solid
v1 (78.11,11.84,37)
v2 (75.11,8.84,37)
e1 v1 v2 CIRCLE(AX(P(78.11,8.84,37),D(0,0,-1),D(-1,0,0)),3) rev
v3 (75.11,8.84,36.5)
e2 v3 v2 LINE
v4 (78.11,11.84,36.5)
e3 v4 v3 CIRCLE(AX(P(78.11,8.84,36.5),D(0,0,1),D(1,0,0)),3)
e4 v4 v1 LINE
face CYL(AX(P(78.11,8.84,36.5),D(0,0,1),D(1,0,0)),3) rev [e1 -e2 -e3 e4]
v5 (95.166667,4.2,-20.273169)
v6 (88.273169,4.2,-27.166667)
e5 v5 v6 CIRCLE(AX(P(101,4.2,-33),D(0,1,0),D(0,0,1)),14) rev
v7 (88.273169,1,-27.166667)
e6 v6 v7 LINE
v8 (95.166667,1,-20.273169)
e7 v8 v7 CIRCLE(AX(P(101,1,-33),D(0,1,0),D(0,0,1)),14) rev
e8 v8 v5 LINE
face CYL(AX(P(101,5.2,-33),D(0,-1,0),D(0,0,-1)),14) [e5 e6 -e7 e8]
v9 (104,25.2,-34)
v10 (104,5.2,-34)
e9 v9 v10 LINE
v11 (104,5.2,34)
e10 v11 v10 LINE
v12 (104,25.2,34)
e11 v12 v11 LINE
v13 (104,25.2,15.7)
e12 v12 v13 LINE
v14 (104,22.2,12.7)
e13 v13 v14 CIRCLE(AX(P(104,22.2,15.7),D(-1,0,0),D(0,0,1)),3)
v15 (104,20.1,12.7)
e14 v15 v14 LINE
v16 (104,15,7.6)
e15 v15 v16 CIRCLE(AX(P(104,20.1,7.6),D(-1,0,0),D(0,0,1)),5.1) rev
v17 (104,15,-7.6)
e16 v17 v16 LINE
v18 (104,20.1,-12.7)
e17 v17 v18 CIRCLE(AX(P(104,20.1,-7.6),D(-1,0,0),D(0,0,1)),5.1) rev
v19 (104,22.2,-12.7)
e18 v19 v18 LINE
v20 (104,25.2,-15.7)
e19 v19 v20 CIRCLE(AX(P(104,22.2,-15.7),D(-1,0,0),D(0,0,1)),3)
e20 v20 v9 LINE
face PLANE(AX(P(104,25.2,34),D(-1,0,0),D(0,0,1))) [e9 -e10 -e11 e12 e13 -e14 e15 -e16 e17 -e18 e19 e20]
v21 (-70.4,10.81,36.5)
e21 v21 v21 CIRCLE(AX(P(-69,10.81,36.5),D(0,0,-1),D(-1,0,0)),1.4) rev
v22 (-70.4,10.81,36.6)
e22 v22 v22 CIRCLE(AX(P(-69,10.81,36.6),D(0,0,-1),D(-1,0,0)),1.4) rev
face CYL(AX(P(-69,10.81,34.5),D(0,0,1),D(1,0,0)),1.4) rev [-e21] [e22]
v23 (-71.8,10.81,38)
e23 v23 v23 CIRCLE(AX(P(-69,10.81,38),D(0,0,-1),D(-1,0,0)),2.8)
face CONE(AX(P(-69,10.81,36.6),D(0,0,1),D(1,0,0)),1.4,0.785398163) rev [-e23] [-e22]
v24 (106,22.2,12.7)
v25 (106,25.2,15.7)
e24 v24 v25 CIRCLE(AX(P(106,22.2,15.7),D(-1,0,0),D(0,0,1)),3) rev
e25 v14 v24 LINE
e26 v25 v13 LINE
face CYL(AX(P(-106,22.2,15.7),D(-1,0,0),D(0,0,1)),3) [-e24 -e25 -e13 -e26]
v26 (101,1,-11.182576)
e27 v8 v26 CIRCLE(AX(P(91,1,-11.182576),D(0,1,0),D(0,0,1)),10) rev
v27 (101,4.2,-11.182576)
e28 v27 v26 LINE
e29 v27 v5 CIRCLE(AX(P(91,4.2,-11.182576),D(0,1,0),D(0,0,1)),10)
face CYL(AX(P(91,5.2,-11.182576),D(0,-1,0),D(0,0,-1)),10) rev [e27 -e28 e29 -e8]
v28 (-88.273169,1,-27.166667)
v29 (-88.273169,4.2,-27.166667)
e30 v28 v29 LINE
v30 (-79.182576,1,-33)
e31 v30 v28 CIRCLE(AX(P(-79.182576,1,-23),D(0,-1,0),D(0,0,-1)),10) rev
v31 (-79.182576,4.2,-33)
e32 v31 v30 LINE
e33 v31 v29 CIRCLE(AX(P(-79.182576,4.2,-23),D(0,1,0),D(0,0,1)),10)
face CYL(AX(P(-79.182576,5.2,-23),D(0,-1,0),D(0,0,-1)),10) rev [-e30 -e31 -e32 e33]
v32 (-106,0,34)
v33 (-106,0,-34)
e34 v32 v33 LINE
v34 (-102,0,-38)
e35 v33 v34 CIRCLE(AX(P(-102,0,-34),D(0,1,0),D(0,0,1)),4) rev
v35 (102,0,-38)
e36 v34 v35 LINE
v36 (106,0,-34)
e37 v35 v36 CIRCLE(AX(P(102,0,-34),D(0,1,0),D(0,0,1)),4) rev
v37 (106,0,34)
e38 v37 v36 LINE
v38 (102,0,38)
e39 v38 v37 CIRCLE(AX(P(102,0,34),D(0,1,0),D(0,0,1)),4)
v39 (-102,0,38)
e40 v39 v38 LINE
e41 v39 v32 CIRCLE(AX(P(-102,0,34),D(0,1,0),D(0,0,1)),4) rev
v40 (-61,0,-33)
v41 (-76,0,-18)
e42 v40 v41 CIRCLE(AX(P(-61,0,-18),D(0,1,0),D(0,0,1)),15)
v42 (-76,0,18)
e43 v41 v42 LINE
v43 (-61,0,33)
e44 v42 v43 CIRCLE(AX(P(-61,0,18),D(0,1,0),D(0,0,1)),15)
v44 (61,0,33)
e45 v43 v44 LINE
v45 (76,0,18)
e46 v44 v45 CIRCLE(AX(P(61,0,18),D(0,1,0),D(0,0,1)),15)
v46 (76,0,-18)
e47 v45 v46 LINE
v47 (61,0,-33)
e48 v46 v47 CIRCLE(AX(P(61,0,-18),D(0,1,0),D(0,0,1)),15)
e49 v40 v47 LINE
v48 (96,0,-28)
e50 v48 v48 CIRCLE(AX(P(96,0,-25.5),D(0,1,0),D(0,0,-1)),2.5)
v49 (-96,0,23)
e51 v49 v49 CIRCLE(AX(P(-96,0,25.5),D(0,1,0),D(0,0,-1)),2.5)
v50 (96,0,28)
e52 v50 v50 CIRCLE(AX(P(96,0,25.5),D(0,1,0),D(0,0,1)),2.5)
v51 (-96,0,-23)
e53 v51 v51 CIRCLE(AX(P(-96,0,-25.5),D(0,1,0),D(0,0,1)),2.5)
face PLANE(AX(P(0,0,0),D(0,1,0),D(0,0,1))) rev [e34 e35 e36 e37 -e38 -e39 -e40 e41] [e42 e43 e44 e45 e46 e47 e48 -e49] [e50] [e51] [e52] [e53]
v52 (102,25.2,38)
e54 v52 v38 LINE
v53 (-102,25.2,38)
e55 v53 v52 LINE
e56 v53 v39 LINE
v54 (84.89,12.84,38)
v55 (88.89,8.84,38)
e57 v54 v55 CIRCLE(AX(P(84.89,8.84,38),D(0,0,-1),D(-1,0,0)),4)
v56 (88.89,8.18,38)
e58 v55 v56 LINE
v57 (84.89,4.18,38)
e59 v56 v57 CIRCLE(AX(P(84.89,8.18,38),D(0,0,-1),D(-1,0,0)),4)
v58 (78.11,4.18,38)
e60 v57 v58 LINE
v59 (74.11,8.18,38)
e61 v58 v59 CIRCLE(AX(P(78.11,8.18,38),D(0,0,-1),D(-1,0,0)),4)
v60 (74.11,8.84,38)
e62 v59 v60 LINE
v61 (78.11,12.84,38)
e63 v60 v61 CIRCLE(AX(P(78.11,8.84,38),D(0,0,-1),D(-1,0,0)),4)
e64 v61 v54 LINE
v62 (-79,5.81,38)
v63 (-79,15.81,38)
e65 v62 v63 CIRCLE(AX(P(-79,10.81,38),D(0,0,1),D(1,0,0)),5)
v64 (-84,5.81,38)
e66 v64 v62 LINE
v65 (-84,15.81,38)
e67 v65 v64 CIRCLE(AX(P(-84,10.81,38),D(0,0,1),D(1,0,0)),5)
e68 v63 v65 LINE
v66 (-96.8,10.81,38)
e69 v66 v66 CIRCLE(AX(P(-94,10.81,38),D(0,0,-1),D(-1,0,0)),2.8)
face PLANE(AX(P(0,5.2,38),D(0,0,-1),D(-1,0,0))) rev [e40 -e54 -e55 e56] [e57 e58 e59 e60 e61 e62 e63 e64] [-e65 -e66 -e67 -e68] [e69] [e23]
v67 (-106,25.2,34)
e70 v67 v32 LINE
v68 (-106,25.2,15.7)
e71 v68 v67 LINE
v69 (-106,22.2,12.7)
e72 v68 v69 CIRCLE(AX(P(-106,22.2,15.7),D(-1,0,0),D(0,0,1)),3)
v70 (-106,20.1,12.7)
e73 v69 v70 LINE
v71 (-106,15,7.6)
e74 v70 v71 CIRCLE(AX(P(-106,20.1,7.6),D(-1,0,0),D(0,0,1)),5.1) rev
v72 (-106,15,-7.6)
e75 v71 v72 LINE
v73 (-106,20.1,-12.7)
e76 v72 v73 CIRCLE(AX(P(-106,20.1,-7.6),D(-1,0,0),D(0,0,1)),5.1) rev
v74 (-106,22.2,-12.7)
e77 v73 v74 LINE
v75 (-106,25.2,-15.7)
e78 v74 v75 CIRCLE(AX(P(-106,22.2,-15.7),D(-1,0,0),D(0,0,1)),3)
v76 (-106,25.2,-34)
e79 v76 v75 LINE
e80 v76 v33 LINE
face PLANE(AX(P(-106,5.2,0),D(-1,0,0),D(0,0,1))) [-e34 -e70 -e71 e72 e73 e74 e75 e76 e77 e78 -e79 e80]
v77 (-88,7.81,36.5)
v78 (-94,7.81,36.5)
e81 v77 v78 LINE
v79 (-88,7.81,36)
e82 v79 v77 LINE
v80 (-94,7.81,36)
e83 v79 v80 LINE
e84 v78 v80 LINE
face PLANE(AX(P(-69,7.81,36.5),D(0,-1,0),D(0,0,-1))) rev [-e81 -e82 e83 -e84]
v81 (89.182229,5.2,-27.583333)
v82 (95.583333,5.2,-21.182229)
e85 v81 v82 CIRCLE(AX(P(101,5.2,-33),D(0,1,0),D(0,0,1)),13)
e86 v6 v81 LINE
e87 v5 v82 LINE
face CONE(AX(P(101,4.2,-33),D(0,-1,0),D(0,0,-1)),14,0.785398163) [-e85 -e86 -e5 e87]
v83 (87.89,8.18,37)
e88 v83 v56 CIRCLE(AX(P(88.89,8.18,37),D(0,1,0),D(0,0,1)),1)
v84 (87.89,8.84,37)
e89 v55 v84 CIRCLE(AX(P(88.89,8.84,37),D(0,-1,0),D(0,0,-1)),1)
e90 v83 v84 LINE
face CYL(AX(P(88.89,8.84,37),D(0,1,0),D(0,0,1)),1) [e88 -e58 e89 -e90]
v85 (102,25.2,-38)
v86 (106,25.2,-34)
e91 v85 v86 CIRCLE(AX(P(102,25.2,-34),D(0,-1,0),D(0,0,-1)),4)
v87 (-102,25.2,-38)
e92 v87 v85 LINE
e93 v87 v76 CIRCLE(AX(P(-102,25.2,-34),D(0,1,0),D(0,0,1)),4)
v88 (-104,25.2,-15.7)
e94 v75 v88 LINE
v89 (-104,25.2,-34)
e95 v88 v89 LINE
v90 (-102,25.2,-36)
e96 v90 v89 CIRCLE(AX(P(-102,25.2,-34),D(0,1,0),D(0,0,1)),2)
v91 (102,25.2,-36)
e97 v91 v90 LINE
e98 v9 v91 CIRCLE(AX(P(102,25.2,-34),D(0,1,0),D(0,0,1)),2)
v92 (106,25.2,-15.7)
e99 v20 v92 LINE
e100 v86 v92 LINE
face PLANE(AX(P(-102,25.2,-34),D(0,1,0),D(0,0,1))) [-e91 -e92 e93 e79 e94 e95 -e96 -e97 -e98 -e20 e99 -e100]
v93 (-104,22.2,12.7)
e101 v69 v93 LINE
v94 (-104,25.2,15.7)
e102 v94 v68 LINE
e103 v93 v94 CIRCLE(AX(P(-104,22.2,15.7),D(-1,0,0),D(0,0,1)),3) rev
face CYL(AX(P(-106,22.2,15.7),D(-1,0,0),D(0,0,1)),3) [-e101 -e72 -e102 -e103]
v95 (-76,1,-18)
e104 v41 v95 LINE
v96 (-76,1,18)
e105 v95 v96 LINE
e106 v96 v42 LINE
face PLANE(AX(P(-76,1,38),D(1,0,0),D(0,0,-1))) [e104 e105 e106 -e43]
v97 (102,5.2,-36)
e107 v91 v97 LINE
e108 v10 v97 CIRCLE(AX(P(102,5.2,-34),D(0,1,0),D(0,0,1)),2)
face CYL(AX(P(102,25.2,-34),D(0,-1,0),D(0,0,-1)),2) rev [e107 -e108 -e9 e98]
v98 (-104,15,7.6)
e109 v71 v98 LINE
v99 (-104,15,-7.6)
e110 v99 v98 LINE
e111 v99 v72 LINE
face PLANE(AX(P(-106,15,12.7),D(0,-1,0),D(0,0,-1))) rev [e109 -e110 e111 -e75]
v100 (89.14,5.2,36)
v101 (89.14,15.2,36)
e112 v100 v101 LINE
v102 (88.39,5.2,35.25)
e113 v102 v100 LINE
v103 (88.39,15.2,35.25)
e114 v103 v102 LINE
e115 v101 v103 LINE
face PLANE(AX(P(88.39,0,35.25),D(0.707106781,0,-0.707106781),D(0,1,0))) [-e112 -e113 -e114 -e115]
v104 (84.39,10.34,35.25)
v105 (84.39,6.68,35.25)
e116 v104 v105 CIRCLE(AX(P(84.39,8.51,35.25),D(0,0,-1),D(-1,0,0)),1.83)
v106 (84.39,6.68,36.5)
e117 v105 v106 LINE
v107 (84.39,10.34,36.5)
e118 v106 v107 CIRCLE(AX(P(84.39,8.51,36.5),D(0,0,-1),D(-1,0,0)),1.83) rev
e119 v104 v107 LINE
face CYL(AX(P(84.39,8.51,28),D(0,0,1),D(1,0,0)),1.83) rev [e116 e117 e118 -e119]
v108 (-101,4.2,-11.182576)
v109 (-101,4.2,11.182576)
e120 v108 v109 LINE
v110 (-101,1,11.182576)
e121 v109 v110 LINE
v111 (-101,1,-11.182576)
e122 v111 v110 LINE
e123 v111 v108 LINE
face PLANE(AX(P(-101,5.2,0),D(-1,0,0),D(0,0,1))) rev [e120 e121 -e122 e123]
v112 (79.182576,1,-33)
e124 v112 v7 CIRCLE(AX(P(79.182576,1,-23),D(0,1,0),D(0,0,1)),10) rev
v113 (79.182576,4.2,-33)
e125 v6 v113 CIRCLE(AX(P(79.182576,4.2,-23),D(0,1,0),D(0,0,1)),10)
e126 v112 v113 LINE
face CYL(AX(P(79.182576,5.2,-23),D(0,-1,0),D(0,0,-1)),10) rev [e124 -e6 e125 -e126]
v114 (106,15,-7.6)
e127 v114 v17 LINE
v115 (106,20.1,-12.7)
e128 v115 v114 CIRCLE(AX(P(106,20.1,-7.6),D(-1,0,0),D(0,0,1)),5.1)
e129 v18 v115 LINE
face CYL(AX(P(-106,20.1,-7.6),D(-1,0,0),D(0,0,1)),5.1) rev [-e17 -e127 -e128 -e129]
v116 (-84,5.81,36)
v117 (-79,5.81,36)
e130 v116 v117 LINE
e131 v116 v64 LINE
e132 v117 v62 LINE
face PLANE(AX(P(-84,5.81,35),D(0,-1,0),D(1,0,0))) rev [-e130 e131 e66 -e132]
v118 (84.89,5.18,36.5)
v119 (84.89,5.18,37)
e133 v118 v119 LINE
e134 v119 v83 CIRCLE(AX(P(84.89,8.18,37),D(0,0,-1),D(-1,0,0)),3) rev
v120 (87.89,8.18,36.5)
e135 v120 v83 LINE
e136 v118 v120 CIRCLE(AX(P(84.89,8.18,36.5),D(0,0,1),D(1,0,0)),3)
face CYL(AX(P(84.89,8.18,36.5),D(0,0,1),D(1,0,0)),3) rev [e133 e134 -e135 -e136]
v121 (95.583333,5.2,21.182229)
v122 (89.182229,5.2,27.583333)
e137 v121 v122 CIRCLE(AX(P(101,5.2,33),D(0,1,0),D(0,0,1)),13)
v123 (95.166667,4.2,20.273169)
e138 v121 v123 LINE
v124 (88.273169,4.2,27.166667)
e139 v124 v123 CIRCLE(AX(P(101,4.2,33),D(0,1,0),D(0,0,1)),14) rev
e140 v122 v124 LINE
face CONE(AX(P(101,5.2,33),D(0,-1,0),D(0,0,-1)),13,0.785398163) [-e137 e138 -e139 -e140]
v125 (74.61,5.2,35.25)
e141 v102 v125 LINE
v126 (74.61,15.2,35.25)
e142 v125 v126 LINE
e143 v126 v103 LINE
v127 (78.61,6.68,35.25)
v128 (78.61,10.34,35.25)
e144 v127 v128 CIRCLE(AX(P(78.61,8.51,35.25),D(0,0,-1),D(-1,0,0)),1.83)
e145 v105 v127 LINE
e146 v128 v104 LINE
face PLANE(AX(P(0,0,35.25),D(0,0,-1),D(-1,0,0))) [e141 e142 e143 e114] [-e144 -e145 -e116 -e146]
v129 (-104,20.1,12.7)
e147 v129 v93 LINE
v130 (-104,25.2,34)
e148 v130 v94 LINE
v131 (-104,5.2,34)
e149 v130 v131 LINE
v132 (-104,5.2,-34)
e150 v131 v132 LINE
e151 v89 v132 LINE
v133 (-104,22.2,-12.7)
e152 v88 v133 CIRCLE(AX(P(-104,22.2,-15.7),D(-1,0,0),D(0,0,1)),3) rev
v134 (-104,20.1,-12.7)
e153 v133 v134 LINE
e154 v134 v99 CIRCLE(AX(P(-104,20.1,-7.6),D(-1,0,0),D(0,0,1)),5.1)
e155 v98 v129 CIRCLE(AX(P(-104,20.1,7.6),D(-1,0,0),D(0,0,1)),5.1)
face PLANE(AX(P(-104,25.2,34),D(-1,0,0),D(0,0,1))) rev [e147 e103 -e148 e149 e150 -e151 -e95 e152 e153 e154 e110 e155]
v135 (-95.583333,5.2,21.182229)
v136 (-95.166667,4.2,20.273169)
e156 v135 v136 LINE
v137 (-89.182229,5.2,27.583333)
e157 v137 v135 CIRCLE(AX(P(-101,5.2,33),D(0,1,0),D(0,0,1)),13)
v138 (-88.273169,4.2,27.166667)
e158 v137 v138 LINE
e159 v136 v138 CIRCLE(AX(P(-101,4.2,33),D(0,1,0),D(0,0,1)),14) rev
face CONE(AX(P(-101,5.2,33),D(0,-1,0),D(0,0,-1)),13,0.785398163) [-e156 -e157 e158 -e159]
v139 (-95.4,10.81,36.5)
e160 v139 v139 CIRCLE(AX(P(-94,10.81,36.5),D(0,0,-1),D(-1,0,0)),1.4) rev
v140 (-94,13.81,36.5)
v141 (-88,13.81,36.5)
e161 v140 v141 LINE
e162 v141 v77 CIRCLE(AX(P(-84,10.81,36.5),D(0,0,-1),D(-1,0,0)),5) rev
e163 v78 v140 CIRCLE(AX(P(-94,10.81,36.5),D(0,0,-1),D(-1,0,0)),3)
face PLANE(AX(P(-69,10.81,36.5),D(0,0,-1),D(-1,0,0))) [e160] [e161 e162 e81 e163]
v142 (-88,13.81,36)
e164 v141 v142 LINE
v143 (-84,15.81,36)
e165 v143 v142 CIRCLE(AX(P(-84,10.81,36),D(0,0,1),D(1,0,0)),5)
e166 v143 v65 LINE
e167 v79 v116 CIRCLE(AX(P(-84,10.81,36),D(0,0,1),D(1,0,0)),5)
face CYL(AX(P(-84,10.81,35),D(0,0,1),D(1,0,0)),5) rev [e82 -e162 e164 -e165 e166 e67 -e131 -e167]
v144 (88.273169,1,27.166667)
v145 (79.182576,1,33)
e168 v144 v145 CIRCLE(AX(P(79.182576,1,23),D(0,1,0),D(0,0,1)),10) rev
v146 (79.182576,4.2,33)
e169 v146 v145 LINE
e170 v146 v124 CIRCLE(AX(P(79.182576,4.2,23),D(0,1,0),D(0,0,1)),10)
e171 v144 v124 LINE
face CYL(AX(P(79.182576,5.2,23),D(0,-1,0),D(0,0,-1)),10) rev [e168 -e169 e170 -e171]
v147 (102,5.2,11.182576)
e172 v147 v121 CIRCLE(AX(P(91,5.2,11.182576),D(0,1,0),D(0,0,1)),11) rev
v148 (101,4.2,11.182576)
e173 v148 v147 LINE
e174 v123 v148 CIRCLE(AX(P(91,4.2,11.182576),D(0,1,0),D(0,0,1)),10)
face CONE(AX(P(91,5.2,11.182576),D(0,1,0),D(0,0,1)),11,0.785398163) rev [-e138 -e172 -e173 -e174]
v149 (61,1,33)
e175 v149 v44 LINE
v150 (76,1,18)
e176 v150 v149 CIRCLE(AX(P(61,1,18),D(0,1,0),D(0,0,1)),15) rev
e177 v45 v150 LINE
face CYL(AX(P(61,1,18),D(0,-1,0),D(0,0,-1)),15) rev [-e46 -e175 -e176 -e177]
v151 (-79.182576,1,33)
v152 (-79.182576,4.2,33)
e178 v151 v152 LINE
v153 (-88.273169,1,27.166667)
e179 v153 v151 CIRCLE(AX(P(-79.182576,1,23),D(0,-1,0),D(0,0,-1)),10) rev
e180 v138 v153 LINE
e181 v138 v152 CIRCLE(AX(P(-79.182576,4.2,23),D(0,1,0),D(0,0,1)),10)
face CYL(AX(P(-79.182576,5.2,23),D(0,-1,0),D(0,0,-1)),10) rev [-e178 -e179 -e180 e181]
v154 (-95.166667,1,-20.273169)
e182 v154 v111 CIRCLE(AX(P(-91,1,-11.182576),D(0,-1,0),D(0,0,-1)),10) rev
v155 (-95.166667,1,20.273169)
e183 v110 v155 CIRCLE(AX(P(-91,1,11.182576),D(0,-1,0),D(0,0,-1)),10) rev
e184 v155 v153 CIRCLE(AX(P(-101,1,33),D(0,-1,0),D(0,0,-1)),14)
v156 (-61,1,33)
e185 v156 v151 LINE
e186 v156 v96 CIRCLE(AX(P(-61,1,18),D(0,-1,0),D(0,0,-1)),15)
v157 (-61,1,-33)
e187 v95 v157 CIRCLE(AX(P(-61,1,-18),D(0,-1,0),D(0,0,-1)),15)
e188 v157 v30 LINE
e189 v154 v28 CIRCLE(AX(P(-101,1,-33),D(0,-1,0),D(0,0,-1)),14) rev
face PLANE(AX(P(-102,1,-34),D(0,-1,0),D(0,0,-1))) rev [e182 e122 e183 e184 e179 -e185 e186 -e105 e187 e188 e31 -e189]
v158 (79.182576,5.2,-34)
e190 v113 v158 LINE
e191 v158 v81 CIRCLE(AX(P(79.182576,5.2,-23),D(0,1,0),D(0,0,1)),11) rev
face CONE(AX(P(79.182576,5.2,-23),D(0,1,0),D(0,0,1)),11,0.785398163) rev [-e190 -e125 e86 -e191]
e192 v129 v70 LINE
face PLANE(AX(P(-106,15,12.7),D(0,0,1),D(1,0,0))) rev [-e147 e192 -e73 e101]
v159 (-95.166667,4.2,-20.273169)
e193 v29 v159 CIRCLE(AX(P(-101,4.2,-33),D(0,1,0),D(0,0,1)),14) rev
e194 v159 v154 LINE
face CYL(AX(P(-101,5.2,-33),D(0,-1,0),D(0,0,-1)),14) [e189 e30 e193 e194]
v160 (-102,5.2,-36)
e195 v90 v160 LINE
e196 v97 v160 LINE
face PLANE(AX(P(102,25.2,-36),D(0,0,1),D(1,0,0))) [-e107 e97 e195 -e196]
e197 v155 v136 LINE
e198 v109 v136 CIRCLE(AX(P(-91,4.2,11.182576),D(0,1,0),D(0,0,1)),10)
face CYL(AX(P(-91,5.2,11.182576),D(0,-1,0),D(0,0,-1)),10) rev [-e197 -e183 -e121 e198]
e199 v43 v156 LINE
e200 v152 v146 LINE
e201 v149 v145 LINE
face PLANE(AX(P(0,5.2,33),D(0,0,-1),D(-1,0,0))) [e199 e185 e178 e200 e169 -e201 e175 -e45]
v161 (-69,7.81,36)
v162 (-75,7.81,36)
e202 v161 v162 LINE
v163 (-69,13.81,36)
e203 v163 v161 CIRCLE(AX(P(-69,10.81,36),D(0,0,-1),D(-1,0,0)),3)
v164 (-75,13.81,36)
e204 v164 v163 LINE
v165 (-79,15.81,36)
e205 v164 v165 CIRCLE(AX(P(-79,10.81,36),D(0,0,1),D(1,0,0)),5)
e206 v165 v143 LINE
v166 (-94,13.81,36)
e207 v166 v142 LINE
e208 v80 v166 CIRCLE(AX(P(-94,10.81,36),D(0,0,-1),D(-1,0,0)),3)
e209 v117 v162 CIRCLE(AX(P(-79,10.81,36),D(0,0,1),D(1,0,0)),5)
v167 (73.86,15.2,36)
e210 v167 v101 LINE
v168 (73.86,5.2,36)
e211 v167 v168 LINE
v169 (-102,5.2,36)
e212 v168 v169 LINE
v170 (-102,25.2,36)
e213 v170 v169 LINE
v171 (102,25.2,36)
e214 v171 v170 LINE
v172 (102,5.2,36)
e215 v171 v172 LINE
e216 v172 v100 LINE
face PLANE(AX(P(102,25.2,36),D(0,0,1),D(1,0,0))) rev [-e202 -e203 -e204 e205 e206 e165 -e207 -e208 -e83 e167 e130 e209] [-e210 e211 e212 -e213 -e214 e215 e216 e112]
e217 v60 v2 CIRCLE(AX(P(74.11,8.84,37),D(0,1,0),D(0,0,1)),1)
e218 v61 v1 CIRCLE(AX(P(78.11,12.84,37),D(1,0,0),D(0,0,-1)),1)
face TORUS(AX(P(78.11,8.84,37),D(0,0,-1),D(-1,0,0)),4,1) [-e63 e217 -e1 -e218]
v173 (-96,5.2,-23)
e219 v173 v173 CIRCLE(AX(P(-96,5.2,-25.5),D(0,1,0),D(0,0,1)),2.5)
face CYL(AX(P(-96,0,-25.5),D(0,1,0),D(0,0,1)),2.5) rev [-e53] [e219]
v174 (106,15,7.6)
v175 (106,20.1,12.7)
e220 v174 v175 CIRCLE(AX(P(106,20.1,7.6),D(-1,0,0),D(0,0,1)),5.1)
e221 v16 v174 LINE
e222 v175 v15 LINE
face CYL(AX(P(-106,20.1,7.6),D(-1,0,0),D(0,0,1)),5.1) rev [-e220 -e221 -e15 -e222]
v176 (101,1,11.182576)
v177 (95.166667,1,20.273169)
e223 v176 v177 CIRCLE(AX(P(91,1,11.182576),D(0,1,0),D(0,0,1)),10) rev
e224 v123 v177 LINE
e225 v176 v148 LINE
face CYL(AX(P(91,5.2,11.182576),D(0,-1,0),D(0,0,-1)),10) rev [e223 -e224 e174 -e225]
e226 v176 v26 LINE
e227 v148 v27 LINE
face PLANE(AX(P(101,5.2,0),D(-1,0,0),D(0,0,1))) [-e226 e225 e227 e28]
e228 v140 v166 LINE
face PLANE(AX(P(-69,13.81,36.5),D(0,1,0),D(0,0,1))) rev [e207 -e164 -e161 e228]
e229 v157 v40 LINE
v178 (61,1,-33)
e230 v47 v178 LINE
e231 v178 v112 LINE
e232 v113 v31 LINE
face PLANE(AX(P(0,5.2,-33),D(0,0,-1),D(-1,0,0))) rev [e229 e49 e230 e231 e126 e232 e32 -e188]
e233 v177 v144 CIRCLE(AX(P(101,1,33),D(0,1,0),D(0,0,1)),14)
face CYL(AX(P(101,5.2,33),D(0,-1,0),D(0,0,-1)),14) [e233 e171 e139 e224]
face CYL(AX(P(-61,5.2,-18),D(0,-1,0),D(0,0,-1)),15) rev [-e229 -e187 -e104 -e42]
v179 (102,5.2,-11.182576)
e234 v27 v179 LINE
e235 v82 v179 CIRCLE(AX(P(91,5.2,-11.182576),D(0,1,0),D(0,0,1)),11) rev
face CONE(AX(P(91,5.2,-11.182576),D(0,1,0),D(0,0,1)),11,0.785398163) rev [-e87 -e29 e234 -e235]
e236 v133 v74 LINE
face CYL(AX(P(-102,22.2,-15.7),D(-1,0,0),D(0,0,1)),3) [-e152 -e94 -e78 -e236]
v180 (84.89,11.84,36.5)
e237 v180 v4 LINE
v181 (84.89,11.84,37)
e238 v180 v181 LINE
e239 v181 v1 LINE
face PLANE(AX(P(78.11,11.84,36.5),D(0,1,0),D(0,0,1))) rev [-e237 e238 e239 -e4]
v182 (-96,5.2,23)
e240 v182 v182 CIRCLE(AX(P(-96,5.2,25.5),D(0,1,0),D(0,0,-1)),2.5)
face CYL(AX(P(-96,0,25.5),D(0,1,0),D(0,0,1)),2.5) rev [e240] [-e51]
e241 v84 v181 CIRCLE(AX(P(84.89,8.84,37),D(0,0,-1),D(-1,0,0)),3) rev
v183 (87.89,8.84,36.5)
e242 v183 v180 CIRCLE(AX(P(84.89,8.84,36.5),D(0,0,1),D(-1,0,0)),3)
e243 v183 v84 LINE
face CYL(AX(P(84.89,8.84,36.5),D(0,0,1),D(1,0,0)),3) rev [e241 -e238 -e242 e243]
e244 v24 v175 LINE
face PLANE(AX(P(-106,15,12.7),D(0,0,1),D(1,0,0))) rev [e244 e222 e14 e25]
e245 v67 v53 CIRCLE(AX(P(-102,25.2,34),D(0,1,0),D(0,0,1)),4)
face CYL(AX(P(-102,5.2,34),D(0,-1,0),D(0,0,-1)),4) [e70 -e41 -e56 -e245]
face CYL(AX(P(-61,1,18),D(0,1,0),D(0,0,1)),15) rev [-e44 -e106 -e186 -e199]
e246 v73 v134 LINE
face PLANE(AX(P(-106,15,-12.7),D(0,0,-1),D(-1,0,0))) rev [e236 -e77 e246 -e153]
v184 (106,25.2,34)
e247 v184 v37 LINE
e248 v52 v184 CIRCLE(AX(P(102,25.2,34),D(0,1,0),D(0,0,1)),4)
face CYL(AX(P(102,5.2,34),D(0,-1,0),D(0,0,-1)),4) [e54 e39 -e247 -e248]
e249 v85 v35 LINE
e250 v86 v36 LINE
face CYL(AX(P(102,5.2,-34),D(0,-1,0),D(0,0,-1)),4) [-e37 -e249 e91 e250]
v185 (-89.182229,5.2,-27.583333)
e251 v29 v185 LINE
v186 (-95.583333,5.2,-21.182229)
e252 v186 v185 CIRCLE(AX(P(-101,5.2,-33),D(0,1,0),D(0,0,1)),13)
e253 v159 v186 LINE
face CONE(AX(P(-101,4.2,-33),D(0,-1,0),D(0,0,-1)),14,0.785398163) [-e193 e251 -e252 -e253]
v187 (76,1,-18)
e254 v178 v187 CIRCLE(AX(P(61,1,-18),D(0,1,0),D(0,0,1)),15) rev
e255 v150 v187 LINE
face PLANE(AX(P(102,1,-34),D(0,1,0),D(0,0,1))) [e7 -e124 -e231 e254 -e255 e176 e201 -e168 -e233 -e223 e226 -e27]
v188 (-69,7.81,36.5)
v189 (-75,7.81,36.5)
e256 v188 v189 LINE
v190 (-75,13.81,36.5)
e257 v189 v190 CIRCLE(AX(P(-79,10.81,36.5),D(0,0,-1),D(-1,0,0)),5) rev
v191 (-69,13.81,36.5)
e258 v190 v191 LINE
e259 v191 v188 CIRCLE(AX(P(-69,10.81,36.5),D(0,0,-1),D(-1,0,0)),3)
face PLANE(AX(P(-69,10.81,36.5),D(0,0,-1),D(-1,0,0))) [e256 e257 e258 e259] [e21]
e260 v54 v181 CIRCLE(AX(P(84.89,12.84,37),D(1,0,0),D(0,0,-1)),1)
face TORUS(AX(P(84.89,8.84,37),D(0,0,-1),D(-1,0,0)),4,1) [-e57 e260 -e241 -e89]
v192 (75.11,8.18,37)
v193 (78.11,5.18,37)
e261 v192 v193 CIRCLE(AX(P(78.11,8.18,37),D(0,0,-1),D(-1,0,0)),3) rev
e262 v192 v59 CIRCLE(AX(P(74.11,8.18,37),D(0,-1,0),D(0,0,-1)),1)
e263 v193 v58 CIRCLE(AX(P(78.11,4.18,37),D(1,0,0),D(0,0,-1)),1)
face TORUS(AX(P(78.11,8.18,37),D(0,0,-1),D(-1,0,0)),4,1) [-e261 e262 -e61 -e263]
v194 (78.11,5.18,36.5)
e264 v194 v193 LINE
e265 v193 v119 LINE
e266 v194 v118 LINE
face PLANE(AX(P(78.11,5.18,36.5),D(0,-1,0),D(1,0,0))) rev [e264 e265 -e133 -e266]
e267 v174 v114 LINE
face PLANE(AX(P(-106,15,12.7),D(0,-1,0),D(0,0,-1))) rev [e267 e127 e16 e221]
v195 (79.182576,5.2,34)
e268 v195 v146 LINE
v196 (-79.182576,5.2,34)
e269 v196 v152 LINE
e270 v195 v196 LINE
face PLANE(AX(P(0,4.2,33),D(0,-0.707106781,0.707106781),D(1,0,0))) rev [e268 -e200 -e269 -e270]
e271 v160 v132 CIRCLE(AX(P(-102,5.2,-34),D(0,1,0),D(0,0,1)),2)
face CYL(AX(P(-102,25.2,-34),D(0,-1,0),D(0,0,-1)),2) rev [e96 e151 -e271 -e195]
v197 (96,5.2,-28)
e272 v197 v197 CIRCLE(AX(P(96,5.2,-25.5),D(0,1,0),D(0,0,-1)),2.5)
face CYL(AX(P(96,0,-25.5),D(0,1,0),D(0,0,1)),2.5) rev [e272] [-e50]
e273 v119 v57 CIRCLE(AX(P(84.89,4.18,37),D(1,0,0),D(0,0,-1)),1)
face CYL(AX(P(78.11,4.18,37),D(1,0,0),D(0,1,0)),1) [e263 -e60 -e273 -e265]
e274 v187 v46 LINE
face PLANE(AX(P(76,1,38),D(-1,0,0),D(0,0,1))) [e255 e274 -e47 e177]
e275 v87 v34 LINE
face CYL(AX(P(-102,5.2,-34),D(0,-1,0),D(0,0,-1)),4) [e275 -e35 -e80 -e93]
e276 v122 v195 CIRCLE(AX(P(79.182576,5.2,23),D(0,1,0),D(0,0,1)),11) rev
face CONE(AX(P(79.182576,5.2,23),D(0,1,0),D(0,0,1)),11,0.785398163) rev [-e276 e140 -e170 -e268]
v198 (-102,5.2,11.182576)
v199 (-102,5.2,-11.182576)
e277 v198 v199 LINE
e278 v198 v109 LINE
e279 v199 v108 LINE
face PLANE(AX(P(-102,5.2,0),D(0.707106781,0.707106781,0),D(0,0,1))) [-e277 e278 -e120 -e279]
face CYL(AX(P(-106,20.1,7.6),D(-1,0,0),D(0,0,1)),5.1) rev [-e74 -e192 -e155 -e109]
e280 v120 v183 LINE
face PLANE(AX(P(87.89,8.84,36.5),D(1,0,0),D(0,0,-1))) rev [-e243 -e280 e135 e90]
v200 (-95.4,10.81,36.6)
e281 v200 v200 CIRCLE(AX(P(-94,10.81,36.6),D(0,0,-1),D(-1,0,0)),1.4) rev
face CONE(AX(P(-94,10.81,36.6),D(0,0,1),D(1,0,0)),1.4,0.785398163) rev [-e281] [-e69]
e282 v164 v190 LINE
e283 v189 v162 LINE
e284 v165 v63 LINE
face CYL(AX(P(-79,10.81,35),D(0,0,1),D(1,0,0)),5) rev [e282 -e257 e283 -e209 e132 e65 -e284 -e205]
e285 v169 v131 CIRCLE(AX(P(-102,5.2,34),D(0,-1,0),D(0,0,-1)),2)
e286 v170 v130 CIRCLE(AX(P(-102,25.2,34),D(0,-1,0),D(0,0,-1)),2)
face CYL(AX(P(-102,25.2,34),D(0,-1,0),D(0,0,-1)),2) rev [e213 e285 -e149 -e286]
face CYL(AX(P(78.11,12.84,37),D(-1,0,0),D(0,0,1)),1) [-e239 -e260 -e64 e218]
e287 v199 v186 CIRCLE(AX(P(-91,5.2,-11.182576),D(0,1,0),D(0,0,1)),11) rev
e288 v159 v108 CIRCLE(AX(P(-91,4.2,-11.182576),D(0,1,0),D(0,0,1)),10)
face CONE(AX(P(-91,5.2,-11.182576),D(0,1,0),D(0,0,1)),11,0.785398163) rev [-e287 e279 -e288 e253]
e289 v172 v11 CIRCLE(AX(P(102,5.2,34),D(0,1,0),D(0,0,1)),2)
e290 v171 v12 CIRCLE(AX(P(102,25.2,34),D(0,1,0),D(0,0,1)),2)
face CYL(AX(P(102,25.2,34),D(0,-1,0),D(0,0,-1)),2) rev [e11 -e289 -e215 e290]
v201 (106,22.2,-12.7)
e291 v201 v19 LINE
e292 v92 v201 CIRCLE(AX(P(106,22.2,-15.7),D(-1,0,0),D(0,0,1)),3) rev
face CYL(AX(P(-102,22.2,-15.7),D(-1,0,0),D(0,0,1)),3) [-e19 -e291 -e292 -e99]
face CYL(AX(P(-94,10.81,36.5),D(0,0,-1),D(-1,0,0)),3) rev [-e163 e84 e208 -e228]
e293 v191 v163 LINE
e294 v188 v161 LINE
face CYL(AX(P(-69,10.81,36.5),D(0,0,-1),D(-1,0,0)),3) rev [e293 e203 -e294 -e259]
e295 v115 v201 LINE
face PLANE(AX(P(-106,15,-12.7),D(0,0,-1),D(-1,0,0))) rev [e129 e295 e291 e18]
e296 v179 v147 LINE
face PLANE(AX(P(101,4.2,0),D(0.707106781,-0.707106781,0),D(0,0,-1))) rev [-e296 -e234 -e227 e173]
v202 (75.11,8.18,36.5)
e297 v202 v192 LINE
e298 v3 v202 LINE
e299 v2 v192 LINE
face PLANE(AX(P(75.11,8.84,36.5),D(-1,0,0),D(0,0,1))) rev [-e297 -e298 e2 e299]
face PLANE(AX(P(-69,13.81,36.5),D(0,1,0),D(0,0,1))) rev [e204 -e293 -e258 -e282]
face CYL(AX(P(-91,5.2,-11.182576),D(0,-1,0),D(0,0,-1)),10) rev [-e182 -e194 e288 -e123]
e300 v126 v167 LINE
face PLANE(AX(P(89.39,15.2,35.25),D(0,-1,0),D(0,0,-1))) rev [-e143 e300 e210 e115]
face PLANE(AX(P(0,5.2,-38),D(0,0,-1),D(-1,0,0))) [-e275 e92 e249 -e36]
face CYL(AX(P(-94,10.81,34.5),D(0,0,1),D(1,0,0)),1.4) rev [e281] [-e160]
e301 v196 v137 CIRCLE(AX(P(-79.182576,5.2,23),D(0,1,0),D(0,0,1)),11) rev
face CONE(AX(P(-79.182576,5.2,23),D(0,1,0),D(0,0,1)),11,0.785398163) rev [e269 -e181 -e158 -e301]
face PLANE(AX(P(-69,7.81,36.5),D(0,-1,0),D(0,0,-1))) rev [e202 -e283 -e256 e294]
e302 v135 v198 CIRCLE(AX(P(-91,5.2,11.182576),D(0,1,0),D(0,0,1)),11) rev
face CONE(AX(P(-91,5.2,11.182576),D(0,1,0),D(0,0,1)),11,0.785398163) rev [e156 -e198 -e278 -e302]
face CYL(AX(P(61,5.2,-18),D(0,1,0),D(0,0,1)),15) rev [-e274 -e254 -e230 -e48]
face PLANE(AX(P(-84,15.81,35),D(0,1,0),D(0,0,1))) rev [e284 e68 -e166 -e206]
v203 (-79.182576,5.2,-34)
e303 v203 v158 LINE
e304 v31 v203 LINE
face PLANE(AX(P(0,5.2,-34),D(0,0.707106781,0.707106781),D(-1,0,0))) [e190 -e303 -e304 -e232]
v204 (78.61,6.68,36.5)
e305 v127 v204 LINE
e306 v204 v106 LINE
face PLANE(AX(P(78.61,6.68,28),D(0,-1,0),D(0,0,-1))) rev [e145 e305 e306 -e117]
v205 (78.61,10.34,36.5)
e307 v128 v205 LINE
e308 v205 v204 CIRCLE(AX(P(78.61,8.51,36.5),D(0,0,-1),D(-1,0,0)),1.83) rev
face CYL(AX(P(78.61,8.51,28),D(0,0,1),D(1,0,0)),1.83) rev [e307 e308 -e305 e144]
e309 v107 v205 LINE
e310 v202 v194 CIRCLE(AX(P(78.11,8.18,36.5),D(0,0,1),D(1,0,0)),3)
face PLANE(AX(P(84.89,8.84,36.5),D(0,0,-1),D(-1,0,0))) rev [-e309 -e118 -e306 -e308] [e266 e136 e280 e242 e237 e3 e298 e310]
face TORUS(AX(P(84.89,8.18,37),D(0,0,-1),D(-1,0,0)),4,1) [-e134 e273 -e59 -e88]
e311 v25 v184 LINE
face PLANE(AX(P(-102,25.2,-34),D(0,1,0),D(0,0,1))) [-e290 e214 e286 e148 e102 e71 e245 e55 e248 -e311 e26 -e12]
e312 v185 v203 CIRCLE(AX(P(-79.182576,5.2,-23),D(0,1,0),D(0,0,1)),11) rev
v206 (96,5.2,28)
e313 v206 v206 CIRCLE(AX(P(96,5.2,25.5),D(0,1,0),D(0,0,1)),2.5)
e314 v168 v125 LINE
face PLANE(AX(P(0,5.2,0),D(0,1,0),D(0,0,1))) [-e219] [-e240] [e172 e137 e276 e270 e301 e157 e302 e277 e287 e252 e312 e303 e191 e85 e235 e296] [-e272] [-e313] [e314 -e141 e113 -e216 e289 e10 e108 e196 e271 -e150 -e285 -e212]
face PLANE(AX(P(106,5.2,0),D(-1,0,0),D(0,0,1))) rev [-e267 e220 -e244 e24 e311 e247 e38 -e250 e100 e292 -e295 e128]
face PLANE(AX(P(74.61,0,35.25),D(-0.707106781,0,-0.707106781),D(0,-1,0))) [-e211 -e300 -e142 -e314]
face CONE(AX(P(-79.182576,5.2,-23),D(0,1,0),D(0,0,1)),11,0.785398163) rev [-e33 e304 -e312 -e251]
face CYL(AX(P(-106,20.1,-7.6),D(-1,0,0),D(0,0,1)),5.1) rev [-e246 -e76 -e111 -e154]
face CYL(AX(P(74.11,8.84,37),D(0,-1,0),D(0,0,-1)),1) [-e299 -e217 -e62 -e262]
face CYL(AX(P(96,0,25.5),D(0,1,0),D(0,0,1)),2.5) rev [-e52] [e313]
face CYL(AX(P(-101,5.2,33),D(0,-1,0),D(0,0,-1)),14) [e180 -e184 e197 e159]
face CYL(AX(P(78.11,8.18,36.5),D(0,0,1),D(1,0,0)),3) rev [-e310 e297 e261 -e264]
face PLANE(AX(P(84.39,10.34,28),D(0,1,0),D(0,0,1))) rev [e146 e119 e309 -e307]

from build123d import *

# Parameters (mm, degrees)
BOSS_EXTRUDE1_DEPTH = 5.2
FILLET1_R           = 10
BOSS_EXTRUDE2_DEPTH = 1
SKETCH2_R           = 2.5
CUT_EXTRUDE1_DEPTH  = 5.2
BOSS_EXTRUDE3_DEPTH = 20
SKETCH7_W           = 15.78
SKETCH7_H           = 10
BOSS_EXTRUDE5_DEPTH = 0.75
CUT_EXTRUDE2_DEPTH  = 10
CUT_EXTRUDE3_DEPTH  = 1.5
FILLET6_R           = 1
CHAMFER1_SIZE       = 1
CUT_EXTRUDE4_DEPTH  = 3
SKETCH11_R          = 1.4
CUT_EXTRUDE5_DEPTH  = 3.5
CHAMFER2_SIZE       = 1.4
CUT_EXTRUDE6_DEPTH  = 0.5
CHAMFER3_SIZE       = 1
SKETCH13_W          = 25.4
SKETCH13_H          = 10.2
CUT_EXTRUDE7_DEPTH  = 217.847965174
FILLET7_R           = 5.1
FILLET8_R           = 3
FILLET9_R           = 15


with BuildPart() as part:
    # Sketch1 → Boss-Extrude1 (new body)
    with BuildSketch(Plane(origin=(0, 0, 0), x_dir=(1, 0, 0), z_dir=(0, 1, 0))):
        with BuildLine():
            ThreePointArc((-106, -34), (-104.828427125, -36.828427125), (-102, -38))
            Line((-102, -38), (102, -38))
            ThreePointArc((102, -38), (104.828427125, -36.828427125), (106, -34))
            Line((106, -34), (106, 34))
            ThreePointArc((106, 34), (104.828427125, 36.828427125), (102, 38))
            Line((102, 38), (-102, 38))
            ThreePointArc((-102, 38), (-104.828427125, 36.828427125), (-106, 34))
            Line((-106, 34), (-106, -34))
        make_face()
        with BuildLine():
            ThreePointArc((-87, -33), (-91.100505063, -23.100505063), (-101, -19))
            Line((-101, -19), (-101, 19))
            ThreePointArc((-101, 19), (-91.100505063, 23.100505063), (-87, 33))
            Line((-87, 33), (87, 33))
            ThreePointArc((87, 33), (91.100505063, 23.100505063), (101, 19))
            Line((101, 19), (101, -19))
            ThreePointArc((101, -19), (91.100505063, -23.100505063), (87, -33))
            Line((87, -33), (-87, -33))
        make_face(mode=Mode.SUBTRACT)
    extrude(amount=BOSS_EXTRUDE1_DEPTH)

    # Fillet1
    fillet1_edges = [part.edges().sort_by_distance(p)[0] for p in [
        (101, 2.6, -19),
        (87, 2.6, -33),
        (-87, 2.6, -33),
        (-101, 2.6, -19),
        (-101, 2.6, 19),
        (-87, 2.6, 33),
        (87, 2.6, 33),
        (101, 2.6, 19),
    ]]
    fillet(fillet1_edges, radius=FILLET1_R)

    # Sketch3 → Boss-Extrude2 (add)
    with BuildSketch(Plane(origin=(0, 0, 0), x_dir=(-1, 0, 0), z_dir=(0, -1, 0))):
        with BuildLine():
            Line((-102, -38), (-76, -38))
            Line((-76, -38), (-76, 38))
            Line((-76, 38), (-102, 38))
            ThreePointArc((-102, 38), (-104.828427125, 36.828427125), (-106, 34))
            Line((-106, 34), (-106, -34))
            ThreePointArc((-106, -34), (-104.828427125, -36.828427125), (-102, -38))
        make_face()
        with BuildLine():
            Line((102, -38), (76, -38))
            Line((76, -38), (76, 38))
            Line((76, 38), (102, 38))
            ThreePointArc((102, 38), (104.828427125, 36.828427125), (106, 34))
            Line((106, 34), (106, -34))
            ThreePointArc((106, -34), (104.828427125, -36.828427125), (102, -38))
        make_face()
    extrude(amount=-BOSS_EXTRUDE2_DEPTH)

    # Sketch2 → Cut-Extrude1 (cut)
    with BuildSketch(Plane(origin=(0, 5.2, 0), x_dir=(1, 0, 0), z_dir=(0, 1, 0))):
        with Locations(Location((-96, 25.5, 0), (0, 0, 270))):
            Circle(SKETCH2_R)
        with Locations(Location((96, 25.5, 0), (0, 0, 90))):
            Circle(SKETCH2_R)
        with Locations(Location((96, -25.5, 0), (0, 0, 270))):
            Circle(SKETCH2_R)
        with Locations(Location((-96, -25.5, 0), (0, 0, 90))):
            Circle(SKETCH2_R)
    extrude(amount=-CUT_EXTRUDE1_DEPTH, mode=Mode.SUBTRACT)

    # Sketch4 → Boss-Extrude3 (add)
    with BuildSketch(Plane(origin=(0, 5.2, 0), x_dir=(1, 0, 0), z_dir=(0, 1, 0))):
        with BuildLine():
            Line((-102, 38), (102, 38))
            ThreePointArc((102, 38), (104.828427125, 36.828427125), (106, 34))
            Line((106, 34), (106, -34))
            ThreePointArc((106, -34), (104.828427125, -36.828427125), (102, -38))
            Line((102, -38), (-102, -38))
            ThreePointArc((-102, -38), (-104.828427125, -36.828427125), (-106, -34))
            Line((-106, -34), (-106, 34))
            ThreePointArc((-106, 34), (-104.828427125, 36.828427125), (-102, 38))
        make_face()
        with BuildLine():
            Line((102, -36), (-102, -36))
            ThreePointArc((-102, -36), (-103.414213562, -35.414213562), (-104, -34))
            Line((-104, -34), (-104, 34))
            ThreePointArc((-104, 34), (-103.414213562, 35.414213562), (-102, 36))
            Line((-102, 36), (102, 36))
            ThreePointArc((102, 36), (103.414213562, 35.414213562), (104, 34))
            Line((104, 34), (104, -34))
            ThreePointArc((104, -34), (103.414213562, -35.414213562), (102, -36))
        make_face(mode=Mode.SUBTRACT)
    extrude(amount=BOSS_EXTRUDE3_DEPTH)

    # Sketch7 → Boss-Extrude5 (add)
    with BuildSketch(Plane(origin=(0, 0, 36), x_dir=(-1, 0, 0), z_dir=(0, 0, -1))):
        with Locations((-81.5, 10.2)):
            Rectangle(SKETCH7_W, SKETCH7_H)
    extrude(amount=BOSS_EXTRUDE5_DEPTH)

    # Sketch6 → Cut-Extrude2 (cut)
    with BuildSketch(Plane.XY.offset(38)):
        with BuildLine():
            Line((84.39, 10.34), (78.61, 10.34))
            ThreePointArc((78.61, 10.34), (76.78, 8.51), (78.61, 6.68))
            Line((78.61, 6.68), (84.39, 6.68))
            ThreePointArc((84.39, 6.68), (86.22, 8.51), (84.39, 10.34))
        make_face()
    extrude(amount=-CUT_EXTRUDE2_DEPTH, mode=Mode.SUBTRACT)

    # Sketch8 → Cut-Extrude3 (cut)
    with BuildSketch(Plane.XY.offset(38)):
        with BuildLine():
            Line((78.11, 11.84), (84.89, 11.84))
            ThreePointArc((84.89, 11.84), (87.011320344, 10.961320344), (87.89, 8.84))
            Line((87.89, 8.84), (87.89, 8.18))
            ThreePointArc((87.89, 8.18), (87.011320344, 6.058679656), (84.89, 5.18))
            Line((84.89, 5.18), (78.11, 5.18))
            ThreePointArc((78.11, 5.18), (75.988679656, 6.058679656), (75.11, 8.18))
            Line((75.11, 8.18), (75.11, 8.84))
            ThreePointArc((75.11, 8.84), (75.988679656, 10.961320344), (78.11, 11.84))
        make_face()
    extrude(amount=-CUT_EXTRUDE3_DEPTH, mode=Mode.SUBTRACT)

    # Fillet6
    fillet6_edges = [part.edges().sort_by_distance(p)[0] for p in [
        (87.011320344, 10.961320344, 38),
        (81.5, 11.84, 38),
        (75.988679656, 10.961320344, 38),
        (75.11, 8.51, 38),
        (75.988679656, 6.058679656, 38),
        (81.5, 5.18, 38),
        (87.011320344, 6.058679656, 38),
        (87.89, 8.51, 38),
    ]]
    fillet(fillet6_edges, radius=FILLET6_R)

    # Chamfer1
    # the kernel refuses this chamfer: 1 mm, written as the material it takes off along each edge
    with BuildSketch(Plane(origin=(89.39, 5.2, 35.25), x_dir=(0.027495876610582105, 0, 0.999621916911297), z_dir=(0, 1, 0))) as chamfer1_piece_1_section:
        Polygon((CHAMFER1_SIZE * 0.999621916911, -CHAMFER1_SIZE * 0.0274958766106), (-CHAMFER1_SIZE * 0.0274958766106, -CHAMFER1_SIZE * 0.999621916911), (0, 0), align=None)
    chamfer1_piece_1 = extrude(amount=12.571682988, mode=Mode.PRIVATE)
    chamfer1_piece_1 = split(chamfer1_piece_1, bisect_by=Plane(origin=(89.03804089, 11.485841494, 36), z_dir=(0, 0, -1)), keep=Keep.TOP, mode=Mode.PRIVATE)
    add(chamfer1_piece_1, mode=Mode.SUBTRACT)
    with BuildSketch(Plane(origin=(73.61, 17.771682988, 35.25), x_dir=(-0.027495876610582105, 0, 0.999621916911297), z_dir=(0, -1, 0))) as chamfer1_piece_2_section:
        Polygon((CHAMFER1_SIZE * 0.999621916911, -CHAMFER1_SIZE * 0.0274958766106), (-CHAMFER1_SIZE * 0.0274958766106, -CHAMFER1_SIZE * 0.999621916911), (0, 0), align=None)
    chamfer1_piece_2 = extrude(amount=12.571682988, mode=Mode.PRIVATE)
    chamfer1_piece_2 = split(chamfer1_piece_2, bisect_by=Plane(origin=(73.96195911, 11.485841494, 36), z_dir=(0, 0, -1)), keep=Keep.TOP, mode=Mode.PRIVATE)
    add(chamfer1_piece_2, mode=Mode.SUBTRACT)

    # Sketch9 → Cut-Extrude4 (cut)
    with BuildSketch(Plane.XY.offset(38)):
        with BuildLine():
            Line((-84, 15.81), (-79, 15.81))
            ThreePointArc((-79, 15.81), (-74, 10.81), (-79, 5.81))
            Line((-79, 5.81), (-84, 5.81))
            ThreePointArc((-84, 5.81), (-89, 10.81), (-84, 15.81))
        make_face()
    extrude(amount=-CUT_EXTRUDE4_DEPTH, mode=Mode.SUBTRACT)

    # Sketch11 → Cut-Extrude5 (cut)
    with BuildSketch(Plane.XY.offset(38)):
        with Locations((-94, 10.81)):
            Circle(SKETCH11_R)
        with Locations((-69, 10.81)):
            Circle(SKETCH11_R)
    extrude(amount=-CUT_EXTRUDE5_DEPTH, mode=Mode.SUBTRACT)

    # Chamfer2
    chamfer2_edges = [part.edges().sort_by_distance(p)[0] for p in [
        (-95.4, 10.81, 38),
        (-70.4, 10.81, 38),
    ]]
    chamfer(chamfer2_edges, length=CHAMFER2_SIZE)

    # Sketch12 → Cut-Extrude6 (cut)
    with BuildSketch(Plane(origin=(0, 0, 36), x_dir=(-1, 0, 0), z_dir=(0, 0, -1))):
        with BuildLine():
            Line((69, 13.81), (94, 13.81))
            ThreePointArc((94, 13.81), (97, 10.81), (94, 7.81))
            Line((94, 7.81), (69, 7.81))
            ThreePointArc((69, 7.81), (66, 10.81), (69, 13.81))
        make_face()
    extrude(amount=-CUT_EXTRUDE6_DEPTH, mode=Mode.SUBTRACT)

    # Chamfer3
    chamfer3_edges = [part.edges().sort_by_distance(p)[0] for p in [
        (0, 5.2, 33),
        (91.100505063, 5.2, 23.100505063),
        (101, 5.2, 0),
        (91.100505063, 5.2, -23.100505063),
        (0, 5.2, -33),
        (-91.100505063, 5.2, 23.100505063),
        (-101, 5.2, 0),
        (-91.100505063, 5.2, -23.100505063),
        (84.583193019, 5.2, 31.416254115),
        (99.416254115, 5.2, 16.583193019),
        (99.416254115, 5.2, -16.583193019),
        (84.583193019, 5.2, -31.416254115),
        (-84.583193019, 5.2, 31.416254115),
        (-99.416254115, 5.2, 16.583193019),
        (-84.583193019, 5.2, -31.416254115),
        (-99.416254115, 5.2, -16.583193019),
    ]]
    chamfer(chamfer3_edges, length=CHAMFER3_SIZE)

    # Sketch13 → Cut-Extrude7 (cut, through all)
    with BuildSketch(Plane(origin=(106, 0, 0), x_dir=(0, 0, -1), z_dir=(1, 0, 0))):
        with Locations((0, 20.1)):
            Rectangle(SKETCH13_W, SKETCH13_H)
    extrude(amount=-CUT_EXTRUDE7_DEPTH, mode=Mode.SUBTRACT)

    # Fillet7
    fillet7_edges = [part.edges().sort_by_distance(p)[0] for p in [
        (-105, 15, -12.7),
        (-105, 15, 12.7),
        (105, 15, -12.7),
        (105, 15, 12.7),
    ]]
    fillet(fillet7_edges, radius=FILLET7_R)

    # Fillet8
    fillet8_edges = [part.edges().sort_by_distance(p)[0] for p in [
        (-105, 25.2, -12.7),
        (-105, 25.2, 12.7),
        (105, 25.2, -12.7),
        (105, 25.2, 12.7),
    ]]
    fillet(fillet8_edges, radius=FILLET8_R)

    # Fillet9
    fillet9_edges = [part.edges().sort_by_distance(p)[0] for p in [
        (76, 0.5, 33),
        (76, 0.5, -33),
        (-76, 0.5, 33),
        (-76, 0.5, -33),
    ]]
    fillet(fillet9_edges, radius=FILLET9_R)


solid = part.part
